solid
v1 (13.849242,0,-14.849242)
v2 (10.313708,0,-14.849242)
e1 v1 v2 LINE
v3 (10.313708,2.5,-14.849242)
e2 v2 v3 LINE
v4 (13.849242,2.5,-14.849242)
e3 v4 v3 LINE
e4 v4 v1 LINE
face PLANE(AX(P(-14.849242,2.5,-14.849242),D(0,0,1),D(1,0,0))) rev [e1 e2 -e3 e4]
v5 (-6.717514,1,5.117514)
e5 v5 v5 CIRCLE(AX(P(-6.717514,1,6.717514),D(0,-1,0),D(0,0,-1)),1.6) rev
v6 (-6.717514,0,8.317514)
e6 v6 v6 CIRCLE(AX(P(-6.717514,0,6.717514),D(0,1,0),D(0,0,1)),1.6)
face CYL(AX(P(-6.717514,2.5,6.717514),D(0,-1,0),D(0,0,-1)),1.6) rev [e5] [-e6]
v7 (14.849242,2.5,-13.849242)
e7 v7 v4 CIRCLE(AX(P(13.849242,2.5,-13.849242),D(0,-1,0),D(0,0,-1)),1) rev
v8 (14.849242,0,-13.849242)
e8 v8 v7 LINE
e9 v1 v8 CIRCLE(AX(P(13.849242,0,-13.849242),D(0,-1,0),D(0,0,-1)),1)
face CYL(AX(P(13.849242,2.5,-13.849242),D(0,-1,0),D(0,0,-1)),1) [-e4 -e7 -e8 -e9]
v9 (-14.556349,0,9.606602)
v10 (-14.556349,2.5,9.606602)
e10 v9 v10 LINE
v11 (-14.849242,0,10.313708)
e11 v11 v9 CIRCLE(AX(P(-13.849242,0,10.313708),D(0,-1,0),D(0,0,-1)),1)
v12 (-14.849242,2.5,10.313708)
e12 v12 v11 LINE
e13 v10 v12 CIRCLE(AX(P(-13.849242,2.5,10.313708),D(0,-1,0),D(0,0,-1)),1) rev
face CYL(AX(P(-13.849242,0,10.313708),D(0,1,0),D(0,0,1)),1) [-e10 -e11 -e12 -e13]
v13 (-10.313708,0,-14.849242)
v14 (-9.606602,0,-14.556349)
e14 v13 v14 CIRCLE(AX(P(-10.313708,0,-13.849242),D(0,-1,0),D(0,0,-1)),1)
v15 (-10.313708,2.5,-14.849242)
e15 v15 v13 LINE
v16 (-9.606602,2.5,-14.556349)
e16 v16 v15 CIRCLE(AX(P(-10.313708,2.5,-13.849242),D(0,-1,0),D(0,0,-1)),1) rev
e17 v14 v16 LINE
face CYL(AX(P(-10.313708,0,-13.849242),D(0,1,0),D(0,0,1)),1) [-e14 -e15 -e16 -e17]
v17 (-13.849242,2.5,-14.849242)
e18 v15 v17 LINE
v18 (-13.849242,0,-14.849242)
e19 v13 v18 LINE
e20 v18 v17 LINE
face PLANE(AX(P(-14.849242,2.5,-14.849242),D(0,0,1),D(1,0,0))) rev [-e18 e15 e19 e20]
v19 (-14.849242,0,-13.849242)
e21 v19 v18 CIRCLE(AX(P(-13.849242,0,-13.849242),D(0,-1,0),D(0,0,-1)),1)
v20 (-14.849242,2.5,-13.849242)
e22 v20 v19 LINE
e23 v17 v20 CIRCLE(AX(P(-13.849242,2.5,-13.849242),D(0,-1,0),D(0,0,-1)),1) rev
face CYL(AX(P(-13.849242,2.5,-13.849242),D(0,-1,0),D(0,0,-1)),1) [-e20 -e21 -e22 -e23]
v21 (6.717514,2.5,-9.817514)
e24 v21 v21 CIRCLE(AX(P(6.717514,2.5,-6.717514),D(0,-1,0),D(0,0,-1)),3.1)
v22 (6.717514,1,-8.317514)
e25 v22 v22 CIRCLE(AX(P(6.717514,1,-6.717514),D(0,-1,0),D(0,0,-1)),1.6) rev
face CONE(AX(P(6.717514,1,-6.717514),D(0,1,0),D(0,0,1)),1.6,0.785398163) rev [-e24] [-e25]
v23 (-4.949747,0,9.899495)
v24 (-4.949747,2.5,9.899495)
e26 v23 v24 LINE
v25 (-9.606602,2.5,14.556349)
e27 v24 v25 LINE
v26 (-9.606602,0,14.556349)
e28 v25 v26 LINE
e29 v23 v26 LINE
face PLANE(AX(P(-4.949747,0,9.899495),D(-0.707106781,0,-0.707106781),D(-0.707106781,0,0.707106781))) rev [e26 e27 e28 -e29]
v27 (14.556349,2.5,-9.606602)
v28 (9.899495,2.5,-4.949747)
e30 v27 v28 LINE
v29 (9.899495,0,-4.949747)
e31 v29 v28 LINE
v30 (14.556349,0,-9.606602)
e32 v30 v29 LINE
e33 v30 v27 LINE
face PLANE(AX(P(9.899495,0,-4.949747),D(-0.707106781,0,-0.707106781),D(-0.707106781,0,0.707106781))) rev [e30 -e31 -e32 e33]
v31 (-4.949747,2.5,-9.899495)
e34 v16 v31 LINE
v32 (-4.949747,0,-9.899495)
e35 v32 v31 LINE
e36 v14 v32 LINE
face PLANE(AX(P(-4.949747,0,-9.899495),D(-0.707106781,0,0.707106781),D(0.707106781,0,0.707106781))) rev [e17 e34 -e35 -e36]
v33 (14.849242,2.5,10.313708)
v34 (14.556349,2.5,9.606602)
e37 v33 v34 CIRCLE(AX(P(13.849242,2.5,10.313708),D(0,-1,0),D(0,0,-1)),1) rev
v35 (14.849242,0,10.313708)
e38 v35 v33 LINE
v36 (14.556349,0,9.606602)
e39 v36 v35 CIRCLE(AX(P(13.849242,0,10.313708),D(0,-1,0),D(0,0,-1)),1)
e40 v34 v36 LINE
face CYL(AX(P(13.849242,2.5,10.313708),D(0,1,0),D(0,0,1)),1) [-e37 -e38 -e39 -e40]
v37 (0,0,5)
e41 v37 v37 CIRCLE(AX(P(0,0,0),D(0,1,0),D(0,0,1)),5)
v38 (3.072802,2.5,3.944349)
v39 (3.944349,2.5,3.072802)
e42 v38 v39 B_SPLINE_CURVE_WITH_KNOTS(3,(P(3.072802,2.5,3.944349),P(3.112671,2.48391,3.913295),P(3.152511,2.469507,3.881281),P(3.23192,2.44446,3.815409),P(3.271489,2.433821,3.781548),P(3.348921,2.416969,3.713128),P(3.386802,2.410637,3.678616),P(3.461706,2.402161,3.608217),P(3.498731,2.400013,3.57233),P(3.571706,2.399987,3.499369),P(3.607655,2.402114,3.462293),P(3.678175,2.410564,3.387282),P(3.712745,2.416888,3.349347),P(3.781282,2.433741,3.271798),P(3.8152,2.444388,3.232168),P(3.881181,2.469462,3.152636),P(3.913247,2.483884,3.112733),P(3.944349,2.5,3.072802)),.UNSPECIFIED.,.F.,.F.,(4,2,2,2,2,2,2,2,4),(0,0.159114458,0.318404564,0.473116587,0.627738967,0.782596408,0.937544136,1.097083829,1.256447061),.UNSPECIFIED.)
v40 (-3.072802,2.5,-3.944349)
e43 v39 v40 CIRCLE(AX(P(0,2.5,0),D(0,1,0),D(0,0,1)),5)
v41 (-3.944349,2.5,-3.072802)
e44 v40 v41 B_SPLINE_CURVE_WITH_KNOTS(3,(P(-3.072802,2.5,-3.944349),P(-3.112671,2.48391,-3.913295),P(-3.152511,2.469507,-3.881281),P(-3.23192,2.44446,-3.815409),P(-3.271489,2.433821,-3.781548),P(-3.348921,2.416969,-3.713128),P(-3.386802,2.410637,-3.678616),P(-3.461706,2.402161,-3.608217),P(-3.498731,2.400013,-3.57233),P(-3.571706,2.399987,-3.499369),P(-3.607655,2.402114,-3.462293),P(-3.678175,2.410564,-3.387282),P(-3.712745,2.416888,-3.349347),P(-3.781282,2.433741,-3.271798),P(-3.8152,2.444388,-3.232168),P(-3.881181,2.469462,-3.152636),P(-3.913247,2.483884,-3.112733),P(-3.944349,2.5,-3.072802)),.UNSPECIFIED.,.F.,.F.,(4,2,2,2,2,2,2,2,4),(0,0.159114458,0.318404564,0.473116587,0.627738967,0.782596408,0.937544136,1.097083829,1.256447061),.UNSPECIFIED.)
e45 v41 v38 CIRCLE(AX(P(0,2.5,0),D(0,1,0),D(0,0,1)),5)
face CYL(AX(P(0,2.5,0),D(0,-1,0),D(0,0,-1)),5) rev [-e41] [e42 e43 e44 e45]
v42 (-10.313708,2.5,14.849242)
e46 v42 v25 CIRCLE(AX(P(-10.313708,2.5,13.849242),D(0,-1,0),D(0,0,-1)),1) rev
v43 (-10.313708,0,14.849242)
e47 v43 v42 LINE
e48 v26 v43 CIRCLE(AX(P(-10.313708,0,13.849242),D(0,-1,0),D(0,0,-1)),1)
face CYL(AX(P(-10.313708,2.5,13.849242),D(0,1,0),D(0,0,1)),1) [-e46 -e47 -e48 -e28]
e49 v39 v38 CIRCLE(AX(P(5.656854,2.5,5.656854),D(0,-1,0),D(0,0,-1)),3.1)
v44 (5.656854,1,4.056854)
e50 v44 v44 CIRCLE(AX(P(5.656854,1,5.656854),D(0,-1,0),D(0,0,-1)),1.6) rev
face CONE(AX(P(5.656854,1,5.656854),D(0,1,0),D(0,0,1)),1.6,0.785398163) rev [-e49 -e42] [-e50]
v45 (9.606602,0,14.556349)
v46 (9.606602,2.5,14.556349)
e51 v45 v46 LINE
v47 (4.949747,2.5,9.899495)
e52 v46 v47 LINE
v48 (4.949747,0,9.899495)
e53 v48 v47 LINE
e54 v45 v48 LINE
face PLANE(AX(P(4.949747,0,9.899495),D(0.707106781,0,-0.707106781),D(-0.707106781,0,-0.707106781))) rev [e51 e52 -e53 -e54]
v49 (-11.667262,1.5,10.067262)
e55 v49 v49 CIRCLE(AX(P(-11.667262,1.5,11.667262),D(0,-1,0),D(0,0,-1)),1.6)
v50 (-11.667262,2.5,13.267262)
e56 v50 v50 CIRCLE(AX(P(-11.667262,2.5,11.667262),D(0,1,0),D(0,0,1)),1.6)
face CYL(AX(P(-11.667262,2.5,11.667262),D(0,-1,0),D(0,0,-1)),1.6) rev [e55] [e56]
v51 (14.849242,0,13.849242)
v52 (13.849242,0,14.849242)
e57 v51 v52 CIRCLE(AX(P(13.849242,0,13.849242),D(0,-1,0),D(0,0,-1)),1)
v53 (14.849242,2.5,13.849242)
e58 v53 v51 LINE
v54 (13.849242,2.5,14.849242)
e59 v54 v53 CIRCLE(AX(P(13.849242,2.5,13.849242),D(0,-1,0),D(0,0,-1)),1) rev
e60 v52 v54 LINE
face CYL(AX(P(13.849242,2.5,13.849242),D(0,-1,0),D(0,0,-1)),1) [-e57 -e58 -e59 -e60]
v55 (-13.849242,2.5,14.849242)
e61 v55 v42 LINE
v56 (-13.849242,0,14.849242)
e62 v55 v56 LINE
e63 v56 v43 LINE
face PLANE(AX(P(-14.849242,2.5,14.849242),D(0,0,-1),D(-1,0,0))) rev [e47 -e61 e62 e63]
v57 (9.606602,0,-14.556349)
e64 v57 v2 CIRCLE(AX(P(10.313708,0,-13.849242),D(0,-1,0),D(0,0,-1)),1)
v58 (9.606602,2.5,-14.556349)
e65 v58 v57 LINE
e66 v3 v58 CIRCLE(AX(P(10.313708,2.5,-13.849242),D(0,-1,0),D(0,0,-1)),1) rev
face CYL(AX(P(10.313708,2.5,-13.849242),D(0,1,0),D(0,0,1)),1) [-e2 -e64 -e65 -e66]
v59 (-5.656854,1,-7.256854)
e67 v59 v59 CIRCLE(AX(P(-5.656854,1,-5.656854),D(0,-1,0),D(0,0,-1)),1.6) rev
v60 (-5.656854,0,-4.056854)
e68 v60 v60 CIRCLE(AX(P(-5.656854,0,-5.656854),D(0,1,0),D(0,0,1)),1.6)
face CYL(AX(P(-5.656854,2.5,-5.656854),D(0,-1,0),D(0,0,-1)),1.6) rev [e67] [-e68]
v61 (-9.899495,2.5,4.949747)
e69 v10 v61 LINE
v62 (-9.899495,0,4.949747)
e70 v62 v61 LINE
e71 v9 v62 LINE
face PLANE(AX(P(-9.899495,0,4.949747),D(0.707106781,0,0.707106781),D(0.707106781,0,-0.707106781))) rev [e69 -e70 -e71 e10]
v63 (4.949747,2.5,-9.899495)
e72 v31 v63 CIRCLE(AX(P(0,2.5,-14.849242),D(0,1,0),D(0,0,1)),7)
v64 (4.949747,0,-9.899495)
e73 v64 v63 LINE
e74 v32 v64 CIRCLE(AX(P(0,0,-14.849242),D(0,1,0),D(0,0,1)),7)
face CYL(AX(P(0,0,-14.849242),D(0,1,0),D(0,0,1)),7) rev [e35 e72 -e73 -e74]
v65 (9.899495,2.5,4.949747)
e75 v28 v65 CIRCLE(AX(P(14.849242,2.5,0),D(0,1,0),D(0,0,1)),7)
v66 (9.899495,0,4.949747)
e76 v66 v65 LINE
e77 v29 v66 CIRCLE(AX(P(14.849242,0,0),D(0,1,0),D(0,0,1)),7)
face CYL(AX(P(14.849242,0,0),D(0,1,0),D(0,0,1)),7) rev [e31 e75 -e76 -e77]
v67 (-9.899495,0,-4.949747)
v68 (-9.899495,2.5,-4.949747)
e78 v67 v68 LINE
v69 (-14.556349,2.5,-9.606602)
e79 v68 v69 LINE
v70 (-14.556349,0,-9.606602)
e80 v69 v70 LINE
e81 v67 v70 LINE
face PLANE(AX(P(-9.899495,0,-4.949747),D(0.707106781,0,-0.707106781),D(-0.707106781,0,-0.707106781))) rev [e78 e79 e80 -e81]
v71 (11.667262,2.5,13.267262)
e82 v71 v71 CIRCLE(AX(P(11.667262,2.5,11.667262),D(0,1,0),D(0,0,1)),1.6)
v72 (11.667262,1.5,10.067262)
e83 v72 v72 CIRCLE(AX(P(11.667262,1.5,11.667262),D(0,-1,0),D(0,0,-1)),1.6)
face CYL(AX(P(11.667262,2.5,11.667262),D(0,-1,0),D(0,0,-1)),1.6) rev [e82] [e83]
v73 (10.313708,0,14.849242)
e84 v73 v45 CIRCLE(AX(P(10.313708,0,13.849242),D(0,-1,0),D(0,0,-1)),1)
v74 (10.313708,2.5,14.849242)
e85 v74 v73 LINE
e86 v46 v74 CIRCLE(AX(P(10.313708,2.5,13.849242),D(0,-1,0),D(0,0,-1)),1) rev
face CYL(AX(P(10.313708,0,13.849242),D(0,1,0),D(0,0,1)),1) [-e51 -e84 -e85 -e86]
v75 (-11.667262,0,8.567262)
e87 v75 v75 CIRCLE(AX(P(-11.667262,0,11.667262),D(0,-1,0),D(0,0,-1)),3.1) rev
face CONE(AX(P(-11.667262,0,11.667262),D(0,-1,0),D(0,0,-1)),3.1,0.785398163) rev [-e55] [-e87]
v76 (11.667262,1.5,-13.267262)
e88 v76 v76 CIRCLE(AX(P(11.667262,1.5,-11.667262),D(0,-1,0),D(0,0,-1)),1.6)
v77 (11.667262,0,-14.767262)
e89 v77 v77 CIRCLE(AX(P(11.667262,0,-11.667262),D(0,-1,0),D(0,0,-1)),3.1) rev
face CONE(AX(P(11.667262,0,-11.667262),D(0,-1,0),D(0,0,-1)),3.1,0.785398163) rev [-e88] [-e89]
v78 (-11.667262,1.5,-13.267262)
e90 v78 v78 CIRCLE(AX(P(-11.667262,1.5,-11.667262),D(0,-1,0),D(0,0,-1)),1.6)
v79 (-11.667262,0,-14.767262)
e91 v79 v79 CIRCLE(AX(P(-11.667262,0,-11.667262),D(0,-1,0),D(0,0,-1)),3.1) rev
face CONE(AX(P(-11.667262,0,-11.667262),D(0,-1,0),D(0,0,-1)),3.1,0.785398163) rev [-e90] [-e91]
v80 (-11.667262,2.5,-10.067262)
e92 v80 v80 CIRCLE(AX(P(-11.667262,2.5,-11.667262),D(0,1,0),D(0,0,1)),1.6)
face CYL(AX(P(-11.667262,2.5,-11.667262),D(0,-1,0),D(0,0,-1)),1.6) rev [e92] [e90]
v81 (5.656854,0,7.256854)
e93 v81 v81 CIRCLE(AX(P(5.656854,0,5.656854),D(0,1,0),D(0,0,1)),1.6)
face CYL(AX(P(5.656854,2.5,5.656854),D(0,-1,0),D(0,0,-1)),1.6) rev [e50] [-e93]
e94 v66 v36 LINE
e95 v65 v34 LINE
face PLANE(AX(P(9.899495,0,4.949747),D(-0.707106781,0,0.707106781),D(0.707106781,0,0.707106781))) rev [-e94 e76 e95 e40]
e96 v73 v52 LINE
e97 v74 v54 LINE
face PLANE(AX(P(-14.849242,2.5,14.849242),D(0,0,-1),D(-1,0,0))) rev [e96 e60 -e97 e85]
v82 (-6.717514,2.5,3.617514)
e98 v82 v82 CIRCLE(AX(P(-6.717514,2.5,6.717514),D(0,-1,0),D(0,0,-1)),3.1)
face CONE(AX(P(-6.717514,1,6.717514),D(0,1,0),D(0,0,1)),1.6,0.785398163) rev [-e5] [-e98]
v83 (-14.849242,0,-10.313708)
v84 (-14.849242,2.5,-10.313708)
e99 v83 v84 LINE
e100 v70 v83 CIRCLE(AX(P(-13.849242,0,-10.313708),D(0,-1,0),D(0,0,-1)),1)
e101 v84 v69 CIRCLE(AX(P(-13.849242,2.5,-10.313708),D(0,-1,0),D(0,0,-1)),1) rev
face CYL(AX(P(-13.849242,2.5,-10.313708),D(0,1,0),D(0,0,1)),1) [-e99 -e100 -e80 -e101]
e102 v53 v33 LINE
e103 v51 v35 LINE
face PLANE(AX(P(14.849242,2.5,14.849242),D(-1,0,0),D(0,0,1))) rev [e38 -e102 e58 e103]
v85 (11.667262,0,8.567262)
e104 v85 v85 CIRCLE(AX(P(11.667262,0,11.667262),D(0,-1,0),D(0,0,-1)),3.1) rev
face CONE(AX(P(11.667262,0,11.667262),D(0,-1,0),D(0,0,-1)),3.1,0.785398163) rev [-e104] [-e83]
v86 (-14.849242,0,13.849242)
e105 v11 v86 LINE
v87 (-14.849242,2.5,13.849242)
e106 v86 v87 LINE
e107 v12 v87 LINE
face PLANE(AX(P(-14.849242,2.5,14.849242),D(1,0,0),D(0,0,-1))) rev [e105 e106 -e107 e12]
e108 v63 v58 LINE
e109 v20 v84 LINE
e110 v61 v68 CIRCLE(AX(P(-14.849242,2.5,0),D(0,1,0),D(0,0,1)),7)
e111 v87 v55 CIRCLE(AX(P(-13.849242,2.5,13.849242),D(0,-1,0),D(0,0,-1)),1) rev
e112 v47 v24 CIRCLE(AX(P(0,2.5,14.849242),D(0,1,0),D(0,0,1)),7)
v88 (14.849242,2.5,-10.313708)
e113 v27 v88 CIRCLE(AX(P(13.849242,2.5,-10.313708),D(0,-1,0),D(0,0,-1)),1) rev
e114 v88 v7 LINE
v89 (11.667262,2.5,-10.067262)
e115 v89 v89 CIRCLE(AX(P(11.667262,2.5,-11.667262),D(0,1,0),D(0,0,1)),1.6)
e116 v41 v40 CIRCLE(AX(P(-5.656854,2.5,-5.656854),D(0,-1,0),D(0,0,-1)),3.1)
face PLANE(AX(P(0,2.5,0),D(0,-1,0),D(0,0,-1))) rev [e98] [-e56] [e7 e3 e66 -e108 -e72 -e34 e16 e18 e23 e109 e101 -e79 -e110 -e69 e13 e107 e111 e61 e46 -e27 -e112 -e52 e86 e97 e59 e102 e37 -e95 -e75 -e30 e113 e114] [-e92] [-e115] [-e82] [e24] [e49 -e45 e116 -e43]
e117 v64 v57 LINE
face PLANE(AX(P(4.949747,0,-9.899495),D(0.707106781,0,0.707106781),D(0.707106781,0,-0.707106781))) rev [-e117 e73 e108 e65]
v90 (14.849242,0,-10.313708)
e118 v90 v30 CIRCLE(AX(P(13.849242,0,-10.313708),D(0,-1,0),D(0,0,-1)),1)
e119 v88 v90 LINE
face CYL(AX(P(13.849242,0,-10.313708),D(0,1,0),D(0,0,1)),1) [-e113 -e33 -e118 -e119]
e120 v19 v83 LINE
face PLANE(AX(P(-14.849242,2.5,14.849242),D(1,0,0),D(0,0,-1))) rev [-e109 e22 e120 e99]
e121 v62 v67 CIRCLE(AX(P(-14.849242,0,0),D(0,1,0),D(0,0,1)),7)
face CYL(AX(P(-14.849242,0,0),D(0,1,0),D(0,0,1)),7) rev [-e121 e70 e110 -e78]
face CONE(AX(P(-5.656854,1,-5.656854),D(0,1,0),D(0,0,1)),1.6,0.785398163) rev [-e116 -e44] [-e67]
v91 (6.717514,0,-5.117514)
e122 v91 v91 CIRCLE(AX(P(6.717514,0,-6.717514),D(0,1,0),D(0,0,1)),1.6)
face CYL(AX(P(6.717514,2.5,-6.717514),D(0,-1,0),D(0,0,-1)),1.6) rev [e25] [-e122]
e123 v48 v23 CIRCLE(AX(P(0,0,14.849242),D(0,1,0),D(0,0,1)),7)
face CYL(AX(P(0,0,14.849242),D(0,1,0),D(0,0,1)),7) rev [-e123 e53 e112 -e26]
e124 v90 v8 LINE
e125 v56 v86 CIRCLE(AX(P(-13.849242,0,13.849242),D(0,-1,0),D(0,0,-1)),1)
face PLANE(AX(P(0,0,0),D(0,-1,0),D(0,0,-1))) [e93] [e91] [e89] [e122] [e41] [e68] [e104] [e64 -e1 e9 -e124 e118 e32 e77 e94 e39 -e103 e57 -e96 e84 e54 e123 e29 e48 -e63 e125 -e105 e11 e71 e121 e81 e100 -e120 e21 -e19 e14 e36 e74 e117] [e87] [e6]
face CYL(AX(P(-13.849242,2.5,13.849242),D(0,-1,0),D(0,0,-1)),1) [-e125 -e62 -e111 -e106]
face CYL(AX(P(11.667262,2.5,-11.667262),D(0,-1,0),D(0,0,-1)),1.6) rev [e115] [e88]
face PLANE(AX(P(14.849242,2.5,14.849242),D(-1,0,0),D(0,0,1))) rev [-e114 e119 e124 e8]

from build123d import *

# Parameters (mm, degrees)
SKETCH1_W           = 29.69848481
SKETCH1_H           = 29.69848481
SKETCH1_R           = 5
SKETCH1_R_2         = 1.6
BOSS_EXTRUDE1_DEPTH = 2.5
CUT_EXTRUDE1_DEPTH  = 22.148285983
FILLET3_R           = 1
CHAMFER1_SIZE       = 1.5


with BuildPart() as part:
    # Sketch1 → Boss-Extrude1 (new body)
    with BuildSketch(Plane(origin=(0, 0, 0), x_dir=(1, 0, 0), z_dir=(0, 1, 0))):
        Rectangle(SKETCH1_W, SKETCH1_H)
        with Locations(Location((0, 0, 0), (0, 0, 270))):
            Circle(SKETCH1_R, mode=Mode.SUBTRACT)
        with Locations(Location((-5.656854249, 5.656854249, 0), (0, 0, 270))):
            Circle(SKETCH1_R_2, mode=Mode.SUBTRACT)
        with Locations(Location((5.656854249, -5.656854249, 0), (0, 0, 270))):
            Circle(SKETCH1_R_2, mode=Mode.SUBTRACT)
        with Locations(Location((-6.717514421, -6.717514421, 0), (0, 0, 270))):
            Circle(SKETCH1_R_2, mode=Mode.SUBTRACT)
        with Locations(Location((6.717514421, 6.717514421, 0), (0, 0, 270))):
            Circle(SKETCH1_R_2, mode=Mode.SUBTRACT)
        with Locations(Location((-11.66726189, -11.66726189, 0), (0, 0, 270))):
            Circle(SKETCH1_R_2, mode=Mode.SUBTRACT)
        with Locations(Location((-11.66726189, 11.66726189, 0), (0, 0, 270))):
            Circle(SKETCH1_R_2, mode=Mode.SUBTRACT)
        with Locations(Location((11.66726189, 11.66726189, 0), (0, 0, 270))):
            Circle(SKETCH1_R_2, mode=Mode.SUBTRACT)
        with Locations(Location((11.66726189, -11.66726189, 0), (0, 0, 270))):
            Circle(SKETCH1_R_2, mode=Mode.SUBTRACT)
    extrude(amount=BOSS_EXTRUDE1_DEPTH)

    # Sketch2 → Cut-Extrude1 (cut, through all)
    with BuildSketch(Plane(origin=(0, 2.5, 0), x_dir=(1, 0, 0), z_dir=(0, 1, 0))):
        with BuildLine():
            Line((-9.899494937, 4.949747468), (-14.849242405, 9.899494937))
            Line((-14.849242405, 9.899494937), (-14.849242405, -9.899494937))
            Line((-14.849242405, -9.899494937), (-9.899494937, -4.949747468))
            ThreePointArc((-9.899494937, -4.949747468), (-7.849242405, 0), (-9.899494937, 4.949747468))
        make_face()
        with BuildLine():
            Line((9.899494937, 14.849242405), (-9.899494937, 14.849242405))
            Line((-9.899494937, 14.849242405), (-4.949747468, 9.899494937))
            ThreePointArc((-4.949747468, 9.899494937), (0, 7.849242405), (4.949747468, 9.899494937))
            Line((4.949747468, 9.899494937), (9.899494937, 14.849242405))
        make_face()
        with BuildLine():
            Line((14.849242405, -9.899494937), (14.849242405, 9.899494937))
            Line((14.849242405, 9.899494937), (9.899494937, 4.949747468))
            ThreePointArc((9.899494937, 4.949747468), (7.849242405, 0), (9.899494937, -4.949747468))
            Line((9.899494937, -4.949747468), (14.849242405, -9.899494937))
        make_face()
        with BuildLine():
            Line((-9.899494937, -14.849242405), (9.899494937, -14.849242405))
            Line((9.899494937, -14.849242405), (4.949747468, -9.899494937))
            ThreePointArc((4.949747468, -9.899494937), (0, -7.849242405), (-4.949747468, -9.899494937))
            Line((-4.949747468, -9.899494937), (-9.899494937, -14.849242405))
        make_face()
    extrude(amount=-CUT_EXTRUDE1_DEPTH, mode=Mode.SUBTRACT)

    # Fillet3
    fillet3_edges = [part.edges().sort_by_distance(p)[0] for p in [
        (14.849242405, 1.25, -9.899494937),
        (14.849242405, 1.25, 9.899494937),
        (14.849242405, 1.25, 14.849242405),
        (-14.849242405, 1.25, 14.849242405),
        (-14.849242405, 1.25, -14.849242405),
        (-9.899494937, 1.25, -14.849242405),
        (9.899494937, 1.25, -14.849242405),
        (14.849242405, 1.25, -14.849242405),
        (9.899494937, 1.25, 14.849242405),
        (-9.899494937, 1.25, 14.849242405),
        (-14.849242405, 1.25, 9.899494937),
        (-14.849242405, 1.25, -9.899494937),
    ]]
    fillet(fillet3_edges, radius=FILLET3_R)

    # Chamfer1
    # the kernel refuses this chamfer: 1.5 mm, written as the material it takes off along each edge
    with BuildSketch(Plane(origin=(-5.656854249, 2.5, -5.656854249), x_dir=(0, 0, 1), z_dir=(-1, 0, 0))) as chamfer1_piece_1:
        Polygon((1.6 + CHAMFER1_SIZE, 0), (1.6, -CHAMFER1_SIZE), (1.6, 0), align=None)
    revolve(axis=Axis((-5.656854249, 2.5, -5.656854249), (0, 1, 0)), mode=Mode.SUBTRACT)
    with BuildSketch(Plane(origin=(5.656854249, 2.5, 5.656854249), x_dir=(0, 0, 1), z_dir=(-1, 0, 0))) as chamfer1_piece_2:
        Polygon((1.6 + CHAMFER1_SIZE, 0), (1.6, -CHAMFER1_SIZE), (1.6, 0), align=None)
    revolve(axis=Axis((5.656854249, 2.5, 5.656854249), (0, 1, 0)), mode=Mode.SUBTRACT)
    with BuildSketch(Plane(origin=(-6.717514421, 2.5, 6.717514421), x_dir=(0, 0, 1), z_dir=(-1, 0, 0))) as chamfer1_piece_3:
        Polygon((1.6 + CHAMFER1_SIZE, 0), (1.6, -CHAMFER1_SIZE), (1.6, 0), align=None)
    revolve(axis=Axis((-6.717514421, 2.5, 6.717514421), (0, 1, 0)), mode=Mode.SUBTRACT)
    with BuildSketch(Plane(origin=(6.717514421, 2.5, -6.717514421), x_dir=(0, 0, 1), z_dir=(-1, 0, 0))) as chamfer1_piece_4:
        Polygon((1.6 + CHAMFER1_SIZE, 0), (1.6, -CHAMFER1_SIZE), (1.6, 0), align=None)
    revolve(axis=Axis((6.717514421, 2.5, -6.717514421), (0, 1, 0)), mode=Mode.SUBTRACT)
    with BuildSketch(Plane(origin=(-11.66726189, 0, 11.66726189), x_dir=(0, 0, 1), z_dir=(-1, 0, 0))) as chamfer1_piece_5:
        Polygon((1.6 + CHAMFER1_SIZE, 0), (1.6, CHAMFER1_SIZE), (1.6, 0), align=None)
    revolve(axis=Axis((-11.66726189, 0, 11.66726189), (0, 1, 0)), mode=Mode.SUBTRACT)
    with BuildSketch(Plane(origin=(-11.66726189, 0, -11.66726189), x_dir=(0, 0, 1), z_dir=(-1, 0, 0))) as chamfer1_piece_6:
        Polygon((1.6 + CHAMFER1_SIZE, 0), (1.6, CHAMFER1_SIZE), (1.6, 0), align=None)
    revolve(axis=Axis((-11.66726189, 0, -11.66726189), (0, 1, 0)), mode=Mode.SUBTRACT)
    with BuildSketch(Plane(origin=(11.66726189, 0, -11.66726189), x_dir=(0, 0, 1), z_dir=(-1, 0, 0))) as chamfer1_piece_7:
        Polygon((1.6 + CHAMFER1_SIZE, 0), (1.6, CHAMFER1_SIZE), (1.6, 0), align=None)
    revolve(axis=Axis((11.66726189, 0, -11.66726189), (0, 1, 0)), mode=Mode.SUBTRACT)
    with BuildSketch(Plane(origin=(11.66726189, 0, 11.66726189), x_dir=(0, 0, 1), z_dir=(-1, 0, 0))) as chamfer1_piece_8:
        Polygon((1.6 + CHAMFER1_SIZE, 0), (1.6, CHAMFER1_SIZE), (1.6, 0), align=None)
    revolve(axis=Axis((11.66726189, 0, 11.66726189), (0, 1, 0)), mode=Mode.SUBTRACT)


solid = part.part
